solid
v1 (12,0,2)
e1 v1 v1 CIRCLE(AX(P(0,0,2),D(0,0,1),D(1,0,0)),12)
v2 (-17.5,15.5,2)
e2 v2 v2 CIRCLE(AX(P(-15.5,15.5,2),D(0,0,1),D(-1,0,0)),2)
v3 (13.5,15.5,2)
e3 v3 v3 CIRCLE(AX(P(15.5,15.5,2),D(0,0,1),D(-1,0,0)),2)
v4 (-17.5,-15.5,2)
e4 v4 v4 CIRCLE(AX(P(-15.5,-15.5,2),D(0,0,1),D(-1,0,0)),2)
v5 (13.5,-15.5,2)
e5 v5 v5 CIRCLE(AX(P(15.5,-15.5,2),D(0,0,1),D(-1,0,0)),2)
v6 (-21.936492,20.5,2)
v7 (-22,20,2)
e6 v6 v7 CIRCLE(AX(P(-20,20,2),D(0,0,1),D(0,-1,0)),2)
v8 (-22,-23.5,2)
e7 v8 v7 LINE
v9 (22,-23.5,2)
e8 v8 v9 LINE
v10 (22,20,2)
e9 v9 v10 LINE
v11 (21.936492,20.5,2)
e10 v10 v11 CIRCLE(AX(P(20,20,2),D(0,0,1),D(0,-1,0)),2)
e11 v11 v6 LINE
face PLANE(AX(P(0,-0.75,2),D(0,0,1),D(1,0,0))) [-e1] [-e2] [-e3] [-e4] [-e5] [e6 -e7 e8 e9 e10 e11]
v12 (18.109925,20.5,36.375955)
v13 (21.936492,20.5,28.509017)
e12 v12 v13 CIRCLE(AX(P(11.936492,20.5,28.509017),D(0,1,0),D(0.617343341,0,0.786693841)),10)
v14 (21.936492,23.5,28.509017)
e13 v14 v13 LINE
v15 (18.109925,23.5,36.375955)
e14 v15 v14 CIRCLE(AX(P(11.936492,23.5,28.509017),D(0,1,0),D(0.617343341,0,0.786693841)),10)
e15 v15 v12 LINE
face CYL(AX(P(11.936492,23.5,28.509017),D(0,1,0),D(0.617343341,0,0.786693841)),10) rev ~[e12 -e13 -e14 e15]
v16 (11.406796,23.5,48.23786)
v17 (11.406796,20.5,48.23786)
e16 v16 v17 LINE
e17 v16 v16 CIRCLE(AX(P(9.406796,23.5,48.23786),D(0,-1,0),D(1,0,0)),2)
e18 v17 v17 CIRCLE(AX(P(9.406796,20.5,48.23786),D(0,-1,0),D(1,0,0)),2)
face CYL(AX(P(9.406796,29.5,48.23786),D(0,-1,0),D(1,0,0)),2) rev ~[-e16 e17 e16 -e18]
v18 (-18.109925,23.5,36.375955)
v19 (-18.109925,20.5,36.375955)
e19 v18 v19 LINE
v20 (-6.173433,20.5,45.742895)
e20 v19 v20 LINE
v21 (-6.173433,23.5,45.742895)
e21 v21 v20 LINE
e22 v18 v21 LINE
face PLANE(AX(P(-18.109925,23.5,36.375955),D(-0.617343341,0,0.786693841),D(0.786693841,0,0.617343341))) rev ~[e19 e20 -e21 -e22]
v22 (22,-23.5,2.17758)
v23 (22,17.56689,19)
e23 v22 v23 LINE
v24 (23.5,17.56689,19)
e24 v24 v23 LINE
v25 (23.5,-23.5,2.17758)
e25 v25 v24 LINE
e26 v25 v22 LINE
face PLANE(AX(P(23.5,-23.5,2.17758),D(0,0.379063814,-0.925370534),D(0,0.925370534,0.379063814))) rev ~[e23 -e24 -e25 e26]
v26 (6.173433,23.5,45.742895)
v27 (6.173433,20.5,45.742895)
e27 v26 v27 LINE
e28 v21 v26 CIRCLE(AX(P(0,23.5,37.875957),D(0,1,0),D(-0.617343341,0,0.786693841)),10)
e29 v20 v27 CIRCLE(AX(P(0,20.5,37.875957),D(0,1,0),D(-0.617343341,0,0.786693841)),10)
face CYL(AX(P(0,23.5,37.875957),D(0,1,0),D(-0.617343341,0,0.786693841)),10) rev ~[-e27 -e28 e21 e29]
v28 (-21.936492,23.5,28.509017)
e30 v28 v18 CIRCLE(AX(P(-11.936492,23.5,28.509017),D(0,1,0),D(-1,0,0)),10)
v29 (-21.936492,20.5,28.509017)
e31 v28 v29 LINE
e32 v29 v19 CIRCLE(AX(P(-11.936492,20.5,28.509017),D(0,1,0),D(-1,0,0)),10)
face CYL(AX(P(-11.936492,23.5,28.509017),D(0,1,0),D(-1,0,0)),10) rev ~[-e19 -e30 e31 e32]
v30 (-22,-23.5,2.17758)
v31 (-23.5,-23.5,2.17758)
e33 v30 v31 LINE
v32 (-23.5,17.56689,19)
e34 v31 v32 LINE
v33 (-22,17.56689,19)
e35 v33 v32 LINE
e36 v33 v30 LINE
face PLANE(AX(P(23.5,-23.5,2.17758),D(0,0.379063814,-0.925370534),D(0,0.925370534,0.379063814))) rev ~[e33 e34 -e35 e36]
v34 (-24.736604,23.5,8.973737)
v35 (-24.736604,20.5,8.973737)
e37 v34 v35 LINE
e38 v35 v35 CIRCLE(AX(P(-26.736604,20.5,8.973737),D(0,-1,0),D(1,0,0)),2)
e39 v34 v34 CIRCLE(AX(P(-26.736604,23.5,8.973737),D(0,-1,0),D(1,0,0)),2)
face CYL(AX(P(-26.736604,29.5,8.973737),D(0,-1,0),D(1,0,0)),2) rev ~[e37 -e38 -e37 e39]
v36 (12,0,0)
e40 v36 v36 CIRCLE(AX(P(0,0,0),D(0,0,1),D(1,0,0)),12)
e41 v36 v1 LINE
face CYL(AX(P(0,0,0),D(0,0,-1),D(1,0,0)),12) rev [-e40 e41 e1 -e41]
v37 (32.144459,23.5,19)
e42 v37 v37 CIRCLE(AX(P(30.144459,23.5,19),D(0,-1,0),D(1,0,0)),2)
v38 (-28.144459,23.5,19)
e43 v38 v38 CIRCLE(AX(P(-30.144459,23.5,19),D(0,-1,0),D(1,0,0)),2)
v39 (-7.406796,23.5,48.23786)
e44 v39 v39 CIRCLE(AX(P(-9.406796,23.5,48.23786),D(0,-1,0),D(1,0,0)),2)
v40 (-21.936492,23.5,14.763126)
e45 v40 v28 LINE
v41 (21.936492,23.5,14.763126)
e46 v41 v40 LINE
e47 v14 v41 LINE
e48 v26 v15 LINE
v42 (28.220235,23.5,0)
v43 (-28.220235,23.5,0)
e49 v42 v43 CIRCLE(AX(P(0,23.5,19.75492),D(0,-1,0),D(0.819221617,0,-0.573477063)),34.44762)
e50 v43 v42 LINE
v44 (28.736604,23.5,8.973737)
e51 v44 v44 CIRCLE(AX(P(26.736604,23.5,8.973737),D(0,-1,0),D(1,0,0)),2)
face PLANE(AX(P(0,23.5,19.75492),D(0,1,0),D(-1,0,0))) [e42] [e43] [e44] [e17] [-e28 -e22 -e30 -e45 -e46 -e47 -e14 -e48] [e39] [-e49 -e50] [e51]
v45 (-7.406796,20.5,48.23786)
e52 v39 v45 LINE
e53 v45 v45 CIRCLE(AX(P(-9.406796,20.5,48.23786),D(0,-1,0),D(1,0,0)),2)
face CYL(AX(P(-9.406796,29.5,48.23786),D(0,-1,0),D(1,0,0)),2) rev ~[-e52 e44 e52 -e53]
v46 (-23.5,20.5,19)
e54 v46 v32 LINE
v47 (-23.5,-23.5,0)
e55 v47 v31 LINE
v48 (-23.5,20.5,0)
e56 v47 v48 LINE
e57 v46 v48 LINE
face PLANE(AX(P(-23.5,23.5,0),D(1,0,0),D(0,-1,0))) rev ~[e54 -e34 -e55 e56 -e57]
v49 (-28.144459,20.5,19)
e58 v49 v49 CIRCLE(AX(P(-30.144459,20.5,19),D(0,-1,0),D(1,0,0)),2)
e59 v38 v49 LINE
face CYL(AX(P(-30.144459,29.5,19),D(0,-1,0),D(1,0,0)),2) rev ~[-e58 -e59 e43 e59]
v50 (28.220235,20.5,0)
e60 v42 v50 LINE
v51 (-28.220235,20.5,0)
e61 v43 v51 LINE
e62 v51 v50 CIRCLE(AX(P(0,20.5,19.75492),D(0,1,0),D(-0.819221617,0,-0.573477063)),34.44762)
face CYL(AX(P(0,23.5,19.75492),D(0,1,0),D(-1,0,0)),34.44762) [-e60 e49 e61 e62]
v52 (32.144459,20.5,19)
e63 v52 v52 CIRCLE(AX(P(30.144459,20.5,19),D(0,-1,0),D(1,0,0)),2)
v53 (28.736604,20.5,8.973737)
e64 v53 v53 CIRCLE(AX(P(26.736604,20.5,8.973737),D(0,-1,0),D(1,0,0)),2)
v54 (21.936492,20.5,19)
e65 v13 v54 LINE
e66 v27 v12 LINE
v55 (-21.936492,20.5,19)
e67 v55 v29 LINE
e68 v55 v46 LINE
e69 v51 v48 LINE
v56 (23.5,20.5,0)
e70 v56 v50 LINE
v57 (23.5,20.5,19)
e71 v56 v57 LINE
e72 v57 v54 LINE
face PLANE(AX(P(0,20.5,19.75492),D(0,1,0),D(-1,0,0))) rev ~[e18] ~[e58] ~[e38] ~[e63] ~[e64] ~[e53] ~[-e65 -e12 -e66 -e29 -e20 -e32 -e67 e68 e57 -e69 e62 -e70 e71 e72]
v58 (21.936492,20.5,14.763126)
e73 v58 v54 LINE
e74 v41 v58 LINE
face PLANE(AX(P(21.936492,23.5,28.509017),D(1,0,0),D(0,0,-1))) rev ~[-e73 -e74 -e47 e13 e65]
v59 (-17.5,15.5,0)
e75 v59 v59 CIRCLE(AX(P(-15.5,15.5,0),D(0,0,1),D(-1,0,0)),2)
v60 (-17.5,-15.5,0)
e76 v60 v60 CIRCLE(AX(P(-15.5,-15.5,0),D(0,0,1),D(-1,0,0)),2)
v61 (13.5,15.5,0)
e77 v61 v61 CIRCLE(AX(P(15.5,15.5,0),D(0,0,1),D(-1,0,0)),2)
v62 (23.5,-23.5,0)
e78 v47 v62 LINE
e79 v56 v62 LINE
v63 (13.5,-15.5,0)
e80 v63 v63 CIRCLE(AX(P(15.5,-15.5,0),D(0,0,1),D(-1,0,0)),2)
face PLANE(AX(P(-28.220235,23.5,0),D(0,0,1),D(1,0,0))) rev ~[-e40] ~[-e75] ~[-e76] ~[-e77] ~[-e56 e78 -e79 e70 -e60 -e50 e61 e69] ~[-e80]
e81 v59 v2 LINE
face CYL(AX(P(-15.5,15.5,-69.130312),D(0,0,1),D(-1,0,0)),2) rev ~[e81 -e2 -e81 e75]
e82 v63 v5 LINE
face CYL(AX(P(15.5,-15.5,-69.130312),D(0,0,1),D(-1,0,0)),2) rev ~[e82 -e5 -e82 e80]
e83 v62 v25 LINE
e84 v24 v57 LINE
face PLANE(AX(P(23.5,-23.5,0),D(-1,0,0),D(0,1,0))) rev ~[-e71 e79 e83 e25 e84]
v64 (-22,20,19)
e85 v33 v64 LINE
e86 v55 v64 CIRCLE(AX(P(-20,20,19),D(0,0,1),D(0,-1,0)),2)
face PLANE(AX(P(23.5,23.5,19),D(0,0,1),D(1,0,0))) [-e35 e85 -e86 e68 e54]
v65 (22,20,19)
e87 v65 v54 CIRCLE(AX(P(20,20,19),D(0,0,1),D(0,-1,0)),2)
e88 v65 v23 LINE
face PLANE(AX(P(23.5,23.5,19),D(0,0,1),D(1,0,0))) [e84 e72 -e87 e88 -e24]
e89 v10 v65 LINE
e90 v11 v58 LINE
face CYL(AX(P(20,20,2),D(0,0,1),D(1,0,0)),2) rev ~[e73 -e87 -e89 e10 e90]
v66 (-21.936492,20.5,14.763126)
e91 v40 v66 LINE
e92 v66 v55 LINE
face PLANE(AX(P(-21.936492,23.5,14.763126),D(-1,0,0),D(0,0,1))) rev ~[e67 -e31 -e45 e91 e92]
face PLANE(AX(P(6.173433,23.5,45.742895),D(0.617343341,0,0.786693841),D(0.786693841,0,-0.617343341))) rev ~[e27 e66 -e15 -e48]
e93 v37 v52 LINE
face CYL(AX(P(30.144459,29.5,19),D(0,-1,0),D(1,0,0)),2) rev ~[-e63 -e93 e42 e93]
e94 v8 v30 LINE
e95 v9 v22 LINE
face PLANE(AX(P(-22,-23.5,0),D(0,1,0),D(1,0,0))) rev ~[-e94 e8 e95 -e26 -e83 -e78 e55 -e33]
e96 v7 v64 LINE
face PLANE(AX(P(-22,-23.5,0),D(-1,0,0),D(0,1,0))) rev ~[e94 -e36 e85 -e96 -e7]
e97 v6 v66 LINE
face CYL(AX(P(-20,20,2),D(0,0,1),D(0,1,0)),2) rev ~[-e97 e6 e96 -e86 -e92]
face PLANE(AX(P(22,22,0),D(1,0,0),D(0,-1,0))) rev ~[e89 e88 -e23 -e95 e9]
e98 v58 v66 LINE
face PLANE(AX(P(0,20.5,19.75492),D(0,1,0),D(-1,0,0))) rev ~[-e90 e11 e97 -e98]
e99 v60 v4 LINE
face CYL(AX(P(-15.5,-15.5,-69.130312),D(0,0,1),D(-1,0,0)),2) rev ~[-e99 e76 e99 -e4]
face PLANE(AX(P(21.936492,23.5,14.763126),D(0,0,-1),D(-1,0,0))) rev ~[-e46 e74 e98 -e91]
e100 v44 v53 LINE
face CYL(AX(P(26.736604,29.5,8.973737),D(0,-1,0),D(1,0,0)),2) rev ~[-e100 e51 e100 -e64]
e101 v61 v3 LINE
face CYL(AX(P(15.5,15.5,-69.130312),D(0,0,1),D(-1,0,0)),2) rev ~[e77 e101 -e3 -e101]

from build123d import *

# Parameters (mm, degrees)
F1_DEPTH         = 19
F0_W             = 44.0000004768
F0_H             = 45.5000002384
F0_R             = 12
F2_DEPTH         = 2
F3_D             = 4
F5_DEPTH         = 50
F7_DEPTH         = 3
F8_D             = 4
F9_R             = 2
F10_R            = 34.4476203659
F10_W            = 47
F10_H            = 19
F6_W             = 47
F6_H             = 19
F11_DEPTH        = 3
F13_DEPTH        = 25
F14_D            = 4
F14_DEPTH        = 6
F14_TIP          = 1.2017212381
F14_ON_F12_D     = 4
F14_ON_F12_DEPTH = 6
F14_ON_F12_TIP   = 1.2017212381


# Not quite as in the source:
# - a feature names something its author has since deleted; it is built from what else it names


with BuildPart() as f1:
    # F0 (on Top) → F1 (new body)
    with BuildSketch(Plane.XY):
        Polygon((23.5, -23.5), (23.5, 23.5), (-23.5, 23.5), (-23.5, -23.5), (-22.0000002384, -23.5), (-22.0000002384, 22.0000002384), (22.0000002384, 22.0000002384), (22.0000002384, -23.5), align=None)
    extrude(amount=F1_DEPTH)

    # F0 (on Top) → F2 (join)
    with BuildSketch(Plane.XY):
        with Locations((0, -0.7499998808)):
            Rectangle(F0_W, F0_H)
        Circle(F0_R, mode=Mode.SUBTRACT)
    extrude(amount=F2_DEPTH)

    # F3 (through all)
    with Locations(Plane(origin=(0, 0, 0), x_dir=(1, 0, 0), z_dir=(0, 0, -1))):
        with Locations((-15.5, -15.5), (15.5, -15.5), (15.5, 15.5), (-15.5, 15.5)):
            Hole(F3_D / 2)

    # F4 (on face) → F5 (cut)
    with BuildSketch(Plane.YZ.offset(23.5)):
        Polygon((-23.5, 19), (-23.5, 2.1775800269), (17.5668895245, 19), align=None)
    extrude(amount=-F5_DEPTH, mode=Mode.SUBTRACT)

    # F6 (on face) → F7 (join)
    with BuildSketch(Plane(origin=(0, 23.5, 0), x_dir=(-1, 0, 0), z_dir=(0, 1, 0))):
        with BuildLine():
            Line((-23.5, 19), (-25.1444590574, 19))
            ThreePointArc((-25.1444590574, 19), (-28.6799929633, 17.5355339059), (-30.1444590574, 14))
            Line((-30.1444590574, 14), (-30.1444590574, 5))
            ThreePointArc((-30.1444590574, 5), (-28.6799929633, 1.4644660941), (-25.1444590574, 0))
            Line((-25.1444590574, 0), (-23.5, 0))
            Line((-23.5, 0), (-23.5, 19))
        make_face()
        with BuildLine():
            Line((24.0855421871, 19), (23.5, 19))
            Line((23.5, 19), (23.5, 0))
            Line((23.5, 0), (24.0855421871, 0))
            ThreePointArc((24.0855421871, 0), (27.621076093, 1.4644660941), (29.0855421871, 5))
            Line((29.0855421871, 5), (29.0855421871, 14))
            ThreePointArc((29.0855421871, 14), (27.621076093, 17.5355339059), (24.0855421871, 19))
        make_face()
    extrude(amount=-F7_DEPTH)

    # F8 (through all)
    with Locations(Plane(origin=(0, 23.5, 0), x_dir=(-1, 0, 0), z_dir=(0, 1, 0))):
        with Locations((-26.7366040498, 8.9737372473), (28.2633959502, 9.5)):
            Hole(F8_D / 2)

    # F9
    f9_edges = [f1.edges().sort_by_distance(p)[0] for p in [
        (22, 22, 10.5),
        (-22, 22, 10.5),
    ]]
    fillet(f9_edges, radius=F9_R)

    # F10 (on face) + F6 (on face) → F11 (join)
    with BuildSketch(Plane(origin=(0, 23.5, 0), x_dir=(-1, 0, 0), z_dir=(0, 1, 0))):
        with Locations((0, 19.7549201548)):
            Circle(F10_R)
        with Locations((0, 9.5)):
            Rectangle(F10_W, F10_H, mode=Mode.SUBTRACT)
    with BuildSketch(Plane(origin=(0, 23.5, 0), x_dir=(-1, 0, 0), z_dir=(0, 1, 0))):
        with Locations((0, 9.5)):
            Rectangle(F6_W, F6_H)
    extrude(amount=-F11_DEPTH)

    # F12 (on face) → F13 (cut)
    with BuildSketch(Plane(origin=(0, 23.5, 0), x_dir=(-1, 0, 0), z_dir=(0, 1, 0))):
        with BuildLine():
            ThreePointArc((-18.1099253817, 36.3759554919), (-20.9291093364, 32.8831264718), (-21.9364919731, 28.5090170817))
            Line((-21.9364919731, 28.5090170817), (-21.9364919731, 14.7631261498))
            Line((-21.9364919731, 14.7631261498), (21.9364919731, 14.7631261498))
            Line((21.9364919731, 14.7631261498), (21.9364919731, 28.5090170817))
            ThreePointArc((21.9364919731, 28.5090170817), (20.9291093364, 32.8831264718), (18.1099253817, 36.3759554919))
            Line((18.1099253817, 36.3759554919), (6.1734334086, 45.7428952702))
            ThreePointArc((6.1734334086, 45.7428952702), (0, 47.87595686), (-6.1734334086, 45.7428952702))
            Line((-6.1734334086, 45.7428952702), (-18.1099253817, 36.3759554919))
        make_face()
        with BuildLine():
            Line((28.2202352675, 0), (-28.2202352675, 0))
            ThreePointArc((-28.2202352675, 0), (0, -14.6927002111), (28.2202352675, 0))
        make_face()
    extrude(amount=-F13_DEPTH, mode=Mode.SUBTRACT)

    # F14
    with Locations(Plane(origin=(0, 23.5, 0), x_dir=(-1, 0, 0), z_dir=(0, 1, 0))):
        with Locations((-30.1444590574, 19), (-26.7366040498, 8.9737372473), (26.7366040498, 8.9737372473), (30.1444590574, 19)):
            Hole(F14_D / 2, depth=F14_DEPTH)
            with Locations((0, 0, -(F14_DEPTH + F14_TIP / 2))):  # 118° drill point
                Cone(0, F14_D / 2, F14_TIP, mode=Mode.SUBTRACT)

    # F14 on F12
    with Locations(Plane(origin=(0, 23.5, 0), x_dir=(-1, 0, 0), z_dir=(0, 1, 0))):
        with Locations((9.4067957252, 48.2378602028), (-9.4067957252, 48.2378602028)):
            Hole(F14_ON_F12_D / 2, depth=F14_ON_F12_DEPTH)
            with Locations((0, 0, -(F14_ON_F12_DEPTH + F14_ON_F12_TIP / 2))):  # 118° drill point
                Cone(0, F14_ON_F12_D / 2, F14_ON_F12_TIP, mode=Mode.SUBTRACT)


solid = f1.part
